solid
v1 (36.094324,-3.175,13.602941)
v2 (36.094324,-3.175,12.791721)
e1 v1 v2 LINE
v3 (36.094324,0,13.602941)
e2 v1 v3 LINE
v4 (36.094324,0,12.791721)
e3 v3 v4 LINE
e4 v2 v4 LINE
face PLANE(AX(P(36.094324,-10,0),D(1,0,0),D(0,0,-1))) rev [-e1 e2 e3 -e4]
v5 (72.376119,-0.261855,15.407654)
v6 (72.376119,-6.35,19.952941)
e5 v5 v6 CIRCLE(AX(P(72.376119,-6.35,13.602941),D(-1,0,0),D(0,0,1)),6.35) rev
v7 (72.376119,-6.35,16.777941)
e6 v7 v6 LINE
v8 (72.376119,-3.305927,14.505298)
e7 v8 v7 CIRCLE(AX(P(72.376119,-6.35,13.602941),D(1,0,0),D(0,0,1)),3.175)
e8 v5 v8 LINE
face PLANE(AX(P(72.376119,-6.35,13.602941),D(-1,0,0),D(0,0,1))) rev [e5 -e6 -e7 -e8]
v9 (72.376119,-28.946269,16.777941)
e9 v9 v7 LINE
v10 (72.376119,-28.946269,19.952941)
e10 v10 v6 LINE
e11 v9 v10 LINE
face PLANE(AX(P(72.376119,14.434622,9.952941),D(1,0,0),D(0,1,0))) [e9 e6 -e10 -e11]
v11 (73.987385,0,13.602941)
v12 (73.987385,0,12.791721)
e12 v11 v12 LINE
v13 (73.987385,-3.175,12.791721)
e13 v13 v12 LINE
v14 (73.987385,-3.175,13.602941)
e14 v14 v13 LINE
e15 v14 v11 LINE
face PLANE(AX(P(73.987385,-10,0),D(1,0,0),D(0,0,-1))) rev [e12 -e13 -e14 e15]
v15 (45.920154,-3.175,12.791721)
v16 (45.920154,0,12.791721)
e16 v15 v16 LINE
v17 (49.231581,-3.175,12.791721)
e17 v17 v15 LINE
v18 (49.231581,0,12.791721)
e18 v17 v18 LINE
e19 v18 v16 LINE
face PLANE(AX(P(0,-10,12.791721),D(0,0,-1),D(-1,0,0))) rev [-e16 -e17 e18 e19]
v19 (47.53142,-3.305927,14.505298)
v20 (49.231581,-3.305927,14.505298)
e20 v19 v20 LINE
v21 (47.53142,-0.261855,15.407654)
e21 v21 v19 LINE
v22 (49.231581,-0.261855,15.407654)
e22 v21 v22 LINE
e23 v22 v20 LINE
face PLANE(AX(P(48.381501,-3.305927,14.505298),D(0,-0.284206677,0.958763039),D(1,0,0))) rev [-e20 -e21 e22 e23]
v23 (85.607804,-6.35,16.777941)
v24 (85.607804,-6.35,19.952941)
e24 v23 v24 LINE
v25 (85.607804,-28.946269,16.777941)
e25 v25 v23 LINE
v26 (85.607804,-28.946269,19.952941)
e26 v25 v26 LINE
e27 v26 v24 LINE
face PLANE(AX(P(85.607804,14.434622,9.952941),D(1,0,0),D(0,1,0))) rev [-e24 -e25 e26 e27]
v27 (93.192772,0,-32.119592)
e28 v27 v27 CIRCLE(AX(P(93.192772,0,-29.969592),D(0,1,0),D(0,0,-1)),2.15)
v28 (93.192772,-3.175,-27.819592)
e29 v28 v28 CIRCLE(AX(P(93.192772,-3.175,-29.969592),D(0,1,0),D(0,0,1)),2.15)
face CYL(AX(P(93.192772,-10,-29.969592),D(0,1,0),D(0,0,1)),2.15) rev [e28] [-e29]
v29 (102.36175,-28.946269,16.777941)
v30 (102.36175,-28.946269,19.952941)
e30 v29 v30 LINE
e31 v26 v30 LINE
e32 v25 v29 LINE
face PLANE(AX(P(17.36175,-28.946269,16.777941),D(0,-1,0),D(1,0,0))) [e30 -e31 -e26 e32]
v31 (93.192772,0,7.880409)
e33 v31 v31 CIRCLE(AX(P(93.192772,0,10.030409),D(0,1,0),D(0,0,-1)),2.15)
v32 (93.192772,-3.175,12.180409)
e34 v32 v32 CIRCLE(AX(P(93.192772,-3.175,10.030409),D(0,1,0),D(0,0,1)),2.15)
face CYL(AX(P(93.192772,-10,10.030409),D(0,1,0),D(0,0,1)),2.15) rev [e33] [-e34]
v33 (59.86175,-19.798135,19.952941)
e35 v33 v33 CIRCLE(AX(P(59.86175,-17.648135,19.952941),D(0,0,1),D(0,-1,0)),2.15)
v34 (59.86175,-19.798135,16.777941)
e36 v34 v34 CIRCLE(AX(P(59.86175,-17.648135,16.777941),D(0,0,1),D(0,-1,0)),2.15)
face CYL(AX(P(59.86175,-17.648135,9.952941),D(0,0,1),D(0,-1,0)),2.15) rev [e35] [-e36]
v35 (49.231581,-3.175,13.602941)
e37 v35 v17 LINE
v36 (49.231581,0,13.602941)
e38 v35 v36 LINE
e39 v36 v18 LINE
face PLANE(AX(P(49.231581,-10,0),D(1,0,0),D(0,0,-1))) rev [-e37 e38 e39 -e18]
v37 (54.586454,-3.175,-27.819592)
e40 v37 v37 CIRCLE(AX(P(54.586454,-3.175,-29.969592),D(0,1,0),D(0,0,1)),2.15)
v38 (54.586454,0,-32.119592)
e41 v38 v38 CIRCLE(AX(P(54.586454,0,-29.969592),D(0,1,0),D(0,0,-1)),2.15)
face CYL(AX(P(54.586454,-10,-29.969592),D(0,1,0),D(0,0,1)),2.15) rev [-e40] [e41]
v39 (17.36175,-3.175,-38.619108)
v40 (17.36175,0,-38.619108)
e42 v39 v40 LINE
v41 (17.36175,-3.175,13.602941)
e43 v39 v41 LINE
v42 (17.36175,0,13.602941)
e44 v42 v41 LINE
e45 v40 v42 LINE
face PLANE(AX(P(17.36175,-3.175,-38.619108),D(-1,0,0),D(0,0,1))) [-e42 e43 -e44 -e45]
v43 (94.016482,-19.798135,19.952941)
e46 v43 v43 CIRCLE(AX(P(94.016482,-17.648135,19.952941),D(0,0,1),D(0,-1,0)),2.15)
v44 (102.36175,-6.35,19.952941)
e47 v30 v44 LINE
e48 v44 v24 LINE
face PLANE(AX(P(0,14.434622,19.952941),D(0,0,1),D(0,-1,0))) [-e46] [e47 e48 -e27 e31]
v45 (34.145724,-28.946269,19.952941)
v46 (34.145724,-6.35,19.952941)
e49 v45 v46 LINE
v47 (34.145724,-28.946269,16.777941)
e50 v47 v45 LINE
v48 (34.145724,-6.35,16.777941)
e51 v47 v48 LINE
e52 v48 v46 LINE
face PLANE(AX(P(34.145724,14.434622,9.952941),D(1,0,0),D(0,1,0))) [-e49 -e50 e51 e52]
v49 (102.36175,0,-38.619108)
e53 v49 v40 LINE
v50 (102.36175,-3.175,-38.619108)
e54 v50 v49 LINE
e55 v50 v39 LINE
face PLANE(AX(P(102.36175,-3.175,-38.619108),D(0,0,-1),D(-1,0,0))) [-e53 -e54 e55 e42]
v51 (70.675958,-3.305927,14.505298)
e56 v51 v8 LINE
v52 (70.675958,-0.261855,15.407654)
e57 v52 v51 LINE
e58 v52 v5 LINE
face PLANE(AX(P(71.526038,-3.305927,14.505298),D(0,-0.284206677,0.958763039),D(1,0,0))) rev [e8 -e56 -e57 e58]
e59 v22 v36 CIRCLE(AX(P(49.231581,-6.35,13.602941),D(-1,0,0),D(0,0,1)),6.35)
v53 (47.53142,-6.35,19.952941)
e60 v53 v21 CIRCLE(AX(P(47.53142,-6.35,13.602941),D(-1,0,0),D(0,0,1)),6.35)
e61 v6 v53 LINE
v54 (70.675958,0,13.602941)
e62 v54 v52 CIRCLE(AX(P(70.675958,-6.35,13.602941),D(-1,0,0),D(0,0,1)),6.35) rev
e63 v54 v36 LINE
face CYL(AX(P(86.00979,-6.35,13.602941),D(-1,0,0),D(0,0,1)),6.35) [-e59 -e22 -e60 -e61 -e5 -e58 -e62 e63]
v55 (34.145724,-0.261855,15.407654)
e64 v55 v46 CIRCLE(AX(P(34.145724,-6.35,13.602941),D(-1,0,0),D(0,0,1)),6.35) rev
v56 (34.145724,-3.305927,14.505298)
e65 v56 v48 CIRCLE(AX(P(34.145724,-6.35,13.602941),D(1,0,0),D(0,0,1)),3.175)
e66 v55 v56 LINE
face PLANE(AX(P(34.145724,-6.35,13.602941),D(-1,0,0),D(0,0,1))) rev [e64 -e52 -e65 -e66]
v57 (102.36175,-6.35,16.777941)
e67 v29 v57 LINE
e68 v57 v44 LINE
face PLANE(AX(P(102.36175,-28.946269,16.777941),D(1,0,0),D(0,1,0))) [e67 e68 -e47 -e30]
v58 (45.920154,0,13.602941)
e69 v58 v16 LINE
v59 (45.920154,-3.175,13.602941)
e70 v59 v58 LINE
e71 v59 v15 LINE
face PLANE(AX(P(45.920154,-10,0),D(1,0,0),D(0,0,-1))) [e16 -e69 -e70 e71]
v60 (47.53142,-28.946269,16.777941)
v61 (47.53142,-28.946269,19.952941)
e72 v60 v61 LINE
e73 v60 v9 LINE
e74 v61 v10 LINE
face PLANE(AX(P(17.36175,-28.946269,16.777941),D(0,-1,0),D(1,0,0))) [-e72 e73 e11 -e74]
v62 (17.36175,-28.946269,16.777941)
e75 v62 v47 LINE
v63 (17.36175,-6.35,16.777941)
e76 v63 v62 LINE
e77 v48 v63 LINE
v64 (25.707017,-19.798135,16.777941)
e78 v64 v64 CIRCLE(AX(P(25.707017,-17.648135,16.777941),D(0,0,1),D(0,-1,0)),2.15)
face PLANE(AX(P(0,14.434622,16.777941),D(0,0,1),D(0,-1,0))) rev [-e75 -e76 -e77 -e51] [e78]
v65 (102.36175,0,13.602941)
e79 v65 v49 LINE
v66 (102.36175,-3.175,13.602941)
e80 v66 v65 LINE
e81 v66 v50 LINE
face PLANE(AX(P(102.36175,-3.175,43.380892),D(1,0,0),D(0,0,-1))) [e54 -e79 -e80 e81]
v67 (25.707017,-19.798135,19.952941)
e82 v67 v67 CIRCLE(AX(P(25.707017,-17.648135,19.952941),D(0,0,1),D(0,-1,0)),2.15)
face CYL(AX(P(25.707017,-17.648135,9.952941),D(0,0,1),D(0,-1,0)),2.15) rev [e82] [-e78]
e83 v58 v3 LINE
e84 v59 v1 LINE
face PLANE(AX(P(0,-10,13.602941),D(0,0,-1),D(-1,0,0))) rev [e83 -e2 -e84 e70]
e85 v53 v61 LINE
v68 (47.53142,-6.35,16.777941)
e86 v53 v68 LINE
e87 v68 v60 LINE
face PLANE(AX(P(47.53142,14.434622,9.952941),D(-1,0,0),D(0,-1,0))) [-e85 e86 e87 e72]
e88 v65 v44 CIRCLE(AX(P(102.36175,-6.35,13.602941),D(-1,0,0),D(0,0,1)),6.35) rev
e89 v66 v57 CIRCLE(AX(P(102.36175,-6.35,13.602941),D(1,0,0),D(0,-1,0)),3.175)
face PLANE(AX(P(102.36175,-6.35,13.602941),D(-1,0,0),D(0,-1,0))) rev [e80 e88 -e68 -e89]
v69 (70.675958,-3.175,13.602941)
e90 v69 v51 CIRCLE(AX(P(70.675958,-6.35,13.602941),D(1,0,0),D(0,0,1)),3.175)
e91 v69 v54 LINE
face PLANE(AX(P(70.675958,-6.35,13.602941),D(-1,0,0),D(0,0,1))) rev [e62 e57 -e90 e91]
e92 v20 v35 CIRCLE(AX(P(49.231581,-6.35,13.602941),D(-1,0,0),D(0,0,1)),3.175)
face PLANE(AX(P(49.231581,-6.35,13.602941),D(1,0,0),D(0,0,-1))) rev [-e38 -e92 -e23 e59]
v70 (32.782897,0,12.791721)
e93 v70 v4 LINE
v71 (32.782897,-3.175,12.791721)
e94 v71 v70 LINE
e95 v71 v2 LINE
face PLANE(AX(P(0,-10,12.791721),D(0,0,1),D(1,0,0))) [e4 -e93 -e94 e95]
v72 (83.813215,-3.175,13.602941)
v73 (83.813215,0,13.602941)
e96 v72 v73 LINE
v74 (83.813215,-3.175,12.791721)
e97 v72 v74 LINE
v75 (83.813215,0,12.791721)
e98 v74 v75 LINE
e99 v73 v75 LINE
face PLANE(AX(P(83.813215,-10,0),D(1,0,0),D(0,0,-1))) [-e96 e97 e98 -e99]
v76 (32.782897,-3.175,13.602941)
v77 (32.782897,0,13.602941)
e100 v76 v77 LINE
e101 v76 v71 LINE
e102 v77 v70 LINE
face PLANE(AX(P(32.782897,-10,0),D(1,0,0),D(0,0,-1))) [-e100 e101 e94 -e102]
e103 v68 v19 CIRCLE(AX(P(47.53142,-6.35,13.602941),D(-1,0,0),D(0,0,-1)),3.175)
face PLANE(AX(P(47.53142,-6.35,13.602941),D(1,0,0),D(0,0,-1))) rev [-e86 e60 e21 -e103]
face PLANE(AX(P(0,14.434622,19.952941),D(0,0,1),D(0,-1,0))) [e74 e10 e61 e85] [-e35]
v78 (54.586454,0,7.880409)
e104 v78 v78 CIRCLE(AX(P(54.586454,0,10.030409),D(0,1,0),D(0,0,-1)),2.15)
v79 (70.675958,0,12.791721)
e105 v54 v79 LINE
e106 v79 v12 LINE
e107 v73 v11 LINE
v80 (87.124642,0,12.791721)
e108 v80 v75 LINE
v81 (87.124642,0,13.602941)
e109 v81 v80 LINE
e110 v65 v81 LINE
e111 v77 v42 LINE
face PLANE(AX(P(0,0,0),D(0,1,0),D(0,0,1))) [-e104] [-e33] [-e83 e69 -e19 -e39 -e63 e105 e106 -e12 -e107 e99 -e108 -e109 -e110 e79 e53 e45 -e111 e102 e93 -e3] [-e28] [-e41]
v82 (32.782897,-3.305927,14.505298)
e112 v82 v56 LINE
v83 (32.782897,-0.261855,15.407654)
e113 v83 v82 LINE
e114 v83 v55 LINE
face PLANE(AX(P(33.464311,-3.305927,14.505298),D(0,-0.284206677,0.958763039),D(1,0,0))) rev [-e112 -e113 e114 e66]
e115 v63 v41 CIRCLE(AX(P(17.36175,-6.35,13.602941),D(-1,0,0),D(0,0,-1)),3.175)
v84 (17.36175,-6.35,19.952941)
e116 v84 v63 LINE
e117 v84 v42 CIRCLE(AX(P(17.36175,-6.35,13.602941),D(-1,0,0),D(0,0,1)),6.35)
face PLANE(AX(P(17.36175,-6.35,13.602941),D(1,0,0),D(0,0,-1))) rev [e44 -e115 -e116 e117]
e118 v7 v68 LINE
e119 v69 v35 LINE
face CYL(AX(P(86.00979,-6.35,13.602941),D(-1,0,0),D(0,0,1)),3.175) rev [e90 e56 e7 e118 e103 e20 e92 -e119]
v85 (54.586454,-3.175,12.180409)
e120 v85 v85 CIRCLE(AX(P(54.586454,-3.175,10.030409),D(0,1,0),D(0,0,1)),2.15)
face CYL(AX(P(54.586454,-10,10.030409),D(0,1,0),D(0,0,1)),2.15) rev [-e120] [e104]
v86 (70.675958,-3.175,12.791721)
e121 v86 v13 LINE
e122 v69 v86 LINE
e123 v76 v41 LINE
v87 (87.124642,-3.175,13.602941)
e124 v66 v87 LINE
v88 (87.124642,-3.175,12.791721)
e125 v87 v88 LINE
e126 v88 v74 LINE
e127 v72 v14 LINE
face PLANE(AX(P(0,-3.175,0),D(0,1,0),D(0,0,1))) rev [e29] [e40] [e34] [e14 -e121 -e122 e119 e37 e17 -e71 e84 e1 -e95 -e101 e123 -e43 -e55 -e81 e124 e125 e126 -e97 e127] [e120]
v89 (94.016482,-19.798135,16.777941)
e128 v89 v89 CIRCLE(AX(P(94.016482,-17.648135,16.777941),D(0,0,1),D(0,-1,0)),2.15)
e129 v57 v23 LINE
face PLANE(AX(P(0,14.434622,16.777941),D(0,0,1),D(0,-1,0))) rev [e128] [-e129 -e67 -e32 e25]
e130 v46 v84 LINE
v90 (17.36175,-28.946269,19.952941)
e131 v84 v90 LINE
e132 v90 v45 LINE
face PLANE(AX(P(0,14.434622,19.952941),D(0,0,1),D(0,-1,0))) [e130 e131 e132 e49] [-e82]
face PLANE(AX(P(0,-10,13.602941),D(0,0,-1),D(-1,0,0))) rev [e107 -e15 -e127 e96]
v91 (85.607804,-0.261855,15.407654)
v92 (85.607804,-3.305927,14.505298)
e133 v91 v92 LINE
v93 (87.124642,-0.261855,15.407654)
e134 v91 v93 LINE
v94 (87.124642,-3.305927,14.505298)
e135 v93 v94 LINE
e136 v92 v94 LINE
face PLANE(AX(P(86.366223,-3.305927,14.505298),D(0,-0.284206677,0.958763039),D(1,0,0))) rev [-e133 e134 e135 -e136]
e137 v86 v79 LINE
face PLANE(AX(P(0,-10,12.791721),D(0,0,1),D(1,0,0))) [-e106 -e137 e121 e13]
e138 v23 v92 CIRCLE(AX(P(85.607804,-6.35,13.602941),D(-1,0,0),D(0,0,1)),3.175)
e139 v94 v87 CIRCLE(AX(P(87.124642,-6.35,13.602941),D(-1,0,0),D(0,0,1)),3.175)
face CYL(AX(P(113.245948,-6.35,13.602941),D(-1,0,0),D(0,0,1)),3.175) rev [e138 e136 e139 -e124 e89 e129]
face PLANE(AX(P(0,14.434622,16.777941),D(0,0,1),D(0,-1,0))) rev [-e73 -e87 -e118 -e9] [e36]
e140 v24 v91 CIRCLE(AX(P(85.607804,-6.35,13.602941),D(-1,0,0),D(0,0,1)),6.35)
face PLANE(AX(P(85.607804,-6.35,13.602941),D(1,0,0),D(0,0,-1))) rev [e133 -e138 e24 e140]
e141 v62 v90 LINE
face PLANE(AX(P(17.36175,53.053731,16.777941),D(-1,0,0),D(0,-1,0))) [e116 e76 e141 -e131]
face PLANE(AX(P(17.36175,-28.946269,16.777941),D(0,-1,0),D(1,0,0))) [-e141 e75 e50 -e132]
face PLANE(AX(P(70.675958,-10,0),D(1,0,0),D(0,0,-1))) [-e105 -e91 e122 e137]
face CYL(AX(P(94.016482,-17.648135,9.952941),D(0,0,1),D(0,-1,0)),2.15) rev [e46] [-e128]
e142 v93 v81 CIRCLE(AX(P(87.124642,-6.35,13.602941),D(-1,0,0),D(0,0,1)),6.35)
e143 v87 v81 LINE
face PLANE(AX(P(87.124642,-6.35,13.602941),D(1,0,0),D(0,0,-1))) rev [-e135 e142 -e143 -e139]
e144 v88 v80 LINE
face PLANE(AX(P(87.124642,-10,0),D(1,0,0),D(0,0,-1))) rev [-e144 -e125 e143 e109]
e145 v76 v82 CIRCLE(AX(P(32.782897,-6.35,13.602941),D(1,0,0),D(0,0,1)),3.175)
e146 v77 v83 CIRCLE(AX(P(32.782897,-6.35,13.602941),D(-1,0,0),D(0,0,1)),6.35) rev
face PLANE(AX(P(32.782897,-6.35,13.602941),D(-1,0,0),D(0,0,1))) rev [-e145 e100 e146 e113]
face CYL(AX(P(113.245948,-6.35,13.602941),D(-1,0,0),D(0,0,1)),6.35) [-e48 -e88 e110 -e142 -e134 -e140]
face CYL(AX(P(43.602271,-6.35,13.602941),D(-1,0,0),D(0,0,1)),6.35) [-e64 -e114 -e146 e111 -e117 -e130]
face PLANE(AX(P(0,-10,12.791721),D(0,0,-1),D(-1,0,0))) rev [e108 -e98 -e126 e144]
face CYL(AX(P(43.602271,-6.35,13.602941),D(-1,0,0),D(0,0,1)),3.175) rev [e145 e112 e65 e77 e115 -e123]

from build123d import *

# Parameters (mm, degrees)
BASE_FLANGE1_DEPTH           = 3.175
SKETCH7_R                    = 2.15
CUT_EXTRUDE1_DEPTH           = 10
CUT_EXTRUDE2_DEPTH           = 10
SKETCHED_START               = 19.282254495
SKETCHED_BEND9_OUTLINE_W     = 16.753945323
SKETCHED_BEND9_OUTLINE_H     = 3.175
SKETCHED_BEND9_OUTLINE_W_2   = 24.844698194
SKETCHED_BEND9_OUTLINE_W_3   = 16.78397474
SKETCHED_BEND9_DEPTH         = 24.098637012
SKETCHED_START_2             = 19.005571507
SKETCHED_BEND9_2_OUTLINE_W   = 21.444377118
SKETCHED_BEND9_2_OUTLINE_H   = 3.175
SKETCHED_BEND9_2_DEPTH       = 0.294970988
SKETCHED_START_3             = 13.602941495
SKETCHED_BEND9_3_OUTLINE_R   = 2.15
SKETCHED_BEND9_3_DEPTH       = 6.35
SKETCHED_START_4             = 14.505297696
SKETCHED_BEND9_4_OUTLINE_W   = 1.51683744
SKETCHED_BEND9_4_OUTLINE_H   = 3.175
SKETCHED_BEND9_4_OUTLINE_W_2 = 1.700160538
SKETCHED_BEND9_4_OUTLINE_W_3 = 1.362827281
SKETCHED_BEND9_4_DEPTH       = 0.415197651
SKETCHED_START_5             = 17.361749674
SKETCHED_BEND9_5_DEPTH       = 85
SKETCHED_START_6             = 70.675958021
SKETCHED_BEND9_6_DEPTH       = 16.44868377
SKETCHED_START_7             = 32.782897133
SKETCHED_BEND9_7_DEPTH       = 16.44868377
SKETCHED_START_8             = 49.231580903
SKETCHED_BEND9_8_DEPTH       = 21.444377118


with BuildPart() as part:
    # Base-Flange1: sheet metal written as solids
    # Sketch2 → Base-Flange1 (new body)
    with BuildSketch(Plane(origin=(0, 0, 0), x_dir=(1, 0, 0), z_dir=(0, 1, 0))):
        Polygon((17.361749674, -43.380891507), (102.361749674, -43.380891507), (102.361749674, -20.784622302), (102.361749674, -13.602941495), (102.361749674, 38.619108493), (17.361749674, 38.619108493), align=None)
    extrude(amount=-BASE_FLANGE1_DEPTH)

    # Sketch7 → Cut-Extrude1 (cut)
    with BuildSketch(Plane(origin=(0, 0, 0), x_dir=(1, 0, 0), z_dir=(0, 1, 0))):
        with Locations(Location((54.586454374, -10.030408526, 0), (0, 0, 270))):
            Circle(SKETCH7_R)
        with Locations(Location((93.192772434, -10.030408526, 0), (0, 0, 270))):
            Circle(SKETCH7_R)
        with Locations(Location((93.192772434, 29.969592019, 0), (0, 0, 270))):
            Circle(SKETCH7_R)
        with Locations(Location((54.586454374, 29.969592019, 0), (0, 0, 270))):
            Circle(SKETCH7_R)
        with Locations(Location((94.016482215, -32.082756904, 0), (0, 0, 270))):
            Circle(SKETCH7_R)
        with Locations(Location((59.861749674, -32.082756904, 0), (0, 0, 270))):
            Circle(SKETCH7_R)
        with Locations(Location((25.707017133, -32.082756904, 0), (0, 0, 270))):
            Circle(SKETCH7_R)
    extrude(amount=-CUT_EXTRUDE1_DEPTH, mode=Mode.SUBTRACT)

    # Sketch8 → Cut-Extrude2 (cut)
    with BuildSketch(Plane(origin=(0, 0, 0), x_dir=(1, 0, 0), z_dir=(0, 1, 0))):
        Polygon((85.607804351, -43.380891507), (72.376118559, -43.380891507), (72.376118559, -14.920495347), (70.675958021, -14.920495347), (70.675958021, -12.791720969), (73.98738483, -12.791720969), (73.98738483, -13.602941495), (83.813214982, -13.602941495), (83.813214982, -12.791720969), (87.124641791, -12.791720969), (87.124641791, -14.920495347), (85.607804351, -14.920495347), align=None)
        Polygon((47.531420365, -43.380891507), (34.145724414, -43.380891507), (34.145724414, -14.920495347), (32.782897133, -14.920495347), (32.782897133, -12.791720969), (36.094323942, -12.791720969), (36.094323942, -13.602941495), (45.920154094, -13.602941495), (45.920154094, -12.791720969), (49.231580903, -12.791720969), (49.231580903, -14.920495347), (47.531420365, -14.920495347), align=None)
    extrude(amount=-CUT_EXTRUDE2_DEPTH, mode=Mode.SUBTRACT)

    # Sketched Bend9: read off the stored shape, not the designer's step
    # Sketched Bend9 outline → Sketched Bend9 (cut)
    with BuildSketch(Plane.XY.offset(SKETCHED_START)):
        with Locations((93.984777013, -1.5875)):
            Rectangle(SKETCHED_BEND9_OUTLINE_W, SKETCHED_BEND9_OUTLINE_H)
        with Locations((59.953769462, -1.5875)):
            Rectangle(SKETCHED_BEND9_OUTLINE_W_2, SKETCHED_BEND9_OUTLINE_H)
        with Locations((25.753737044, -1.5875)):
            Rectangle(SKETCHED_BEND9_OUTLINE_W_3, SKETCHED_BEND9_OUTLINE_H)
    extrude(amount=SKETCHED_BEND9_DEPTH, mode=Mode.SUBTRACT)

    # Sketched Bend9 2 outline → Sketched Bend9 2 (cut)
    with BuildSketch(Plane.XY.offset(SKETCHED_START_2)):
        with Locations((59.953769462, -1.5875)):
            Rectangle(SKETCHED_BEND9_2_OUTLINE_W, SKETCHED_BEND9_2_OUTLINE_H)
    extrude(amount=SKETCHED_BEND9_2_DEPTH, mode=Mode.SUBTRACT)

    # Sketched Bend9 3 outline → Sketched Bend9 3 (add)
    # profile 1 of 3: a face of its own
    with BuildSketch(Plane.XY.offset(SKETCHED_START_3)):
        Polygon((85.607804351, -28.946269205), (102.361749674, -28.946269205), (102.361749674, -3.175), (87.124641791, -3.175), (85.607804351, -3.175), align=None)
        with Locations((94.016482215, -17.648134603)):
            Circle(SKETCHED_BEND9_3_OUTLINE_R, mode=Mode.SUBTRACT)
    # profile 2 of 3: a face of its own
    with BuildSketch(Plane.XY.offset(SKETCHED_START_3)):
        Polygon((72.376118559, -28.946269205), (72.376118559, -3.175), (70.675958021, -3.175), (49.231580903, -3.175), (47.531420365, -3.175), (47.531420365, -28.946269205), align=None)
        with Locations((59.861749674, -17.648134603)):
            Circle(SKETCHED_BEND9_3_OUTLINE_R, mode=Mode.SUBTRACT)
    # profile 3 of 3: a face of its own
    with BuildSketch(Plane.XY.offset(SKETCHED_START_3)):
        Polygon((34.145724414, -28.946269205), (34.145724414, -3.175), (32.782897133, -3.175), (17.361749674, -3.175), (17.361749674, -28.946269205), align=None)
        with Locations((25.707017133, -17.648134603)):
            Circle(SKETCHED_BEND9_3_OUTLINE_R, mode=Mode.SUBTRACT)
    extrude(amount=SKETCHED_BEND9_3_DEPTH)

    # Sketched Bend9 4 outline → Sketched Bend9 4 (add)
    with BuildSketch(Plane.XY.offset(SKETCHED_START_4)):
        with Locations((86.366223071, -1.5875)):
            Rectangle(SKETCHED_BEND9_4_OUTLINE_W, SKETCHED_BEND9_4_OUTLINE_H)
        with Locations((71.52603829, -1.5875)):
            Rectangle(SKETCHED_BEND9_4_OUTLINE_W_2, SKETCHED_BEND9_4_OUTLINE_H)
        with Locations((48.381500634, -1.5875)):
            Rectangle(SKETCHED_BEND9_4_OUTLINE_W_2, SKETCHED_BEND9_4_OUTLINE_H)
        with Locations((33.464310774, -1.5875)):
            Rectangle(SKETCHED_BEND9_4_OUTLINE_W_3, SKETCHED_BEND9_4_OUTLINE_H)
    extrude(amount=SKETCHED_BEND9_4_DEPTH)

    # Sketched Bend9 5 outline → Sketched Bend9 5 (cut)
    with BuildSketch(Plane.YZ.offset(SKETCHED_START_5)):
        with BuildLine():
            ThreePointArc((-3.175, 13.602941495), (-4.10493597, 15.848005525), (-6.35, 16.777941495))
            Line((-6.35, 16.777941495), (-28.946269205, 16.777941495))
            Line((-28.946269205, 16.777941495), (-28.946269205, 13.602941495))
            Line((-28.946269205, 13.602941495), (-3.175, 13.602941495))
        make_face()
        with BuildLine():
            Line((0, 13.602941495), (0, 19.282254495))
            Line((0, 19.282254495), (-3.175, 19.282254495))
            Line((-3.175, 19.282254495), (-3.175, 19.952941495))
            Line((-3.175, 19.952941495), (-6.35, 19.952941495))
            ThreePointArc((-6.35, 19.952941495), (-1.859871939, 18.093069556), (0, 13.602941495))
        make_face()
    extrude(amount=SKETCHED_BEND9_5_DEPTH, mode=Mode.SUBTRACT)

    # Sketched Bend9 6 outline → Sketched Bend9 6 (cut)
    with BuildSketch(Plane.YZ.offset(SKETCHED_START_6)):
        with BuildLine():
            Line((-0.261854704, 15.407653897), (-3.305927352, 14.505297696))
            ThreePointArc((-3.305927352, 14.505297696), (-3.20790232, 14.058844085), (-3.175, 13.602941495))
            Line((-3.175, 13.602941495), (-3.175, 14.505297696))
            Line((-3.175, 14.505297696), (-0.064440893, 14.505297696))
            ThreePointArc((-0.064440893, 14.505297696), (-0.146718462, 14.96007014), (-0.261854704, 15.407653897))
        make_face()
    extrude(amount=SKETCHED_BEND9_6_DEPTH, mode=Mode.SUBTRACT)

    # Sketched Bend9 7 outline → Sketched Bend9 7 (cut)
    with BuildSketch(Plane.YZ.offset(SKETCHED_START_7)):
        with BuildLine():
            Line((-0.261854704, 15.407653897), (-3.305927352, 14.505297696))
            ThreePointArc((-3.305927352, 14.505297696), (-3.20790232, 14.058844085), (-3.175, 13.602941495))
            Line((-3.175, 13.602941495), (-3.175, 14.505297696))
            Line((-3.175, 14.505297696), (-0.064440893, 14.505297696))
            ThreePointArc((-0.064440893, 14.505297696), (-0.146718462, 14.96007014), (-0.261854704, 15.407653897))
        make_face()
    extrude(amount=SKETCHED_BEND9_7_DEPTH, mode=Mode.SUBTRACT)

    # Sketched Bend9 8 outline → Sketched Bend9 8 (add)
    with BuildSketch(Plane.YZ.offset(SKETCHED_START_8)):
        with BuildLine():
            Line((-3.175, 19.005571507), (-3.013221769, 19.005571507))
            ThreePointArc((-3.013221769, 19.005571507), (-3.093752415, 19.054487301), (-3.175, 19.10220281))
            Line((-3.175, 19.10220281), (-3.175, 19.005571507))
        make_face()
    extrude(amount=SKETCHED_BEND9_8_DEPTH)


solid = part.part
